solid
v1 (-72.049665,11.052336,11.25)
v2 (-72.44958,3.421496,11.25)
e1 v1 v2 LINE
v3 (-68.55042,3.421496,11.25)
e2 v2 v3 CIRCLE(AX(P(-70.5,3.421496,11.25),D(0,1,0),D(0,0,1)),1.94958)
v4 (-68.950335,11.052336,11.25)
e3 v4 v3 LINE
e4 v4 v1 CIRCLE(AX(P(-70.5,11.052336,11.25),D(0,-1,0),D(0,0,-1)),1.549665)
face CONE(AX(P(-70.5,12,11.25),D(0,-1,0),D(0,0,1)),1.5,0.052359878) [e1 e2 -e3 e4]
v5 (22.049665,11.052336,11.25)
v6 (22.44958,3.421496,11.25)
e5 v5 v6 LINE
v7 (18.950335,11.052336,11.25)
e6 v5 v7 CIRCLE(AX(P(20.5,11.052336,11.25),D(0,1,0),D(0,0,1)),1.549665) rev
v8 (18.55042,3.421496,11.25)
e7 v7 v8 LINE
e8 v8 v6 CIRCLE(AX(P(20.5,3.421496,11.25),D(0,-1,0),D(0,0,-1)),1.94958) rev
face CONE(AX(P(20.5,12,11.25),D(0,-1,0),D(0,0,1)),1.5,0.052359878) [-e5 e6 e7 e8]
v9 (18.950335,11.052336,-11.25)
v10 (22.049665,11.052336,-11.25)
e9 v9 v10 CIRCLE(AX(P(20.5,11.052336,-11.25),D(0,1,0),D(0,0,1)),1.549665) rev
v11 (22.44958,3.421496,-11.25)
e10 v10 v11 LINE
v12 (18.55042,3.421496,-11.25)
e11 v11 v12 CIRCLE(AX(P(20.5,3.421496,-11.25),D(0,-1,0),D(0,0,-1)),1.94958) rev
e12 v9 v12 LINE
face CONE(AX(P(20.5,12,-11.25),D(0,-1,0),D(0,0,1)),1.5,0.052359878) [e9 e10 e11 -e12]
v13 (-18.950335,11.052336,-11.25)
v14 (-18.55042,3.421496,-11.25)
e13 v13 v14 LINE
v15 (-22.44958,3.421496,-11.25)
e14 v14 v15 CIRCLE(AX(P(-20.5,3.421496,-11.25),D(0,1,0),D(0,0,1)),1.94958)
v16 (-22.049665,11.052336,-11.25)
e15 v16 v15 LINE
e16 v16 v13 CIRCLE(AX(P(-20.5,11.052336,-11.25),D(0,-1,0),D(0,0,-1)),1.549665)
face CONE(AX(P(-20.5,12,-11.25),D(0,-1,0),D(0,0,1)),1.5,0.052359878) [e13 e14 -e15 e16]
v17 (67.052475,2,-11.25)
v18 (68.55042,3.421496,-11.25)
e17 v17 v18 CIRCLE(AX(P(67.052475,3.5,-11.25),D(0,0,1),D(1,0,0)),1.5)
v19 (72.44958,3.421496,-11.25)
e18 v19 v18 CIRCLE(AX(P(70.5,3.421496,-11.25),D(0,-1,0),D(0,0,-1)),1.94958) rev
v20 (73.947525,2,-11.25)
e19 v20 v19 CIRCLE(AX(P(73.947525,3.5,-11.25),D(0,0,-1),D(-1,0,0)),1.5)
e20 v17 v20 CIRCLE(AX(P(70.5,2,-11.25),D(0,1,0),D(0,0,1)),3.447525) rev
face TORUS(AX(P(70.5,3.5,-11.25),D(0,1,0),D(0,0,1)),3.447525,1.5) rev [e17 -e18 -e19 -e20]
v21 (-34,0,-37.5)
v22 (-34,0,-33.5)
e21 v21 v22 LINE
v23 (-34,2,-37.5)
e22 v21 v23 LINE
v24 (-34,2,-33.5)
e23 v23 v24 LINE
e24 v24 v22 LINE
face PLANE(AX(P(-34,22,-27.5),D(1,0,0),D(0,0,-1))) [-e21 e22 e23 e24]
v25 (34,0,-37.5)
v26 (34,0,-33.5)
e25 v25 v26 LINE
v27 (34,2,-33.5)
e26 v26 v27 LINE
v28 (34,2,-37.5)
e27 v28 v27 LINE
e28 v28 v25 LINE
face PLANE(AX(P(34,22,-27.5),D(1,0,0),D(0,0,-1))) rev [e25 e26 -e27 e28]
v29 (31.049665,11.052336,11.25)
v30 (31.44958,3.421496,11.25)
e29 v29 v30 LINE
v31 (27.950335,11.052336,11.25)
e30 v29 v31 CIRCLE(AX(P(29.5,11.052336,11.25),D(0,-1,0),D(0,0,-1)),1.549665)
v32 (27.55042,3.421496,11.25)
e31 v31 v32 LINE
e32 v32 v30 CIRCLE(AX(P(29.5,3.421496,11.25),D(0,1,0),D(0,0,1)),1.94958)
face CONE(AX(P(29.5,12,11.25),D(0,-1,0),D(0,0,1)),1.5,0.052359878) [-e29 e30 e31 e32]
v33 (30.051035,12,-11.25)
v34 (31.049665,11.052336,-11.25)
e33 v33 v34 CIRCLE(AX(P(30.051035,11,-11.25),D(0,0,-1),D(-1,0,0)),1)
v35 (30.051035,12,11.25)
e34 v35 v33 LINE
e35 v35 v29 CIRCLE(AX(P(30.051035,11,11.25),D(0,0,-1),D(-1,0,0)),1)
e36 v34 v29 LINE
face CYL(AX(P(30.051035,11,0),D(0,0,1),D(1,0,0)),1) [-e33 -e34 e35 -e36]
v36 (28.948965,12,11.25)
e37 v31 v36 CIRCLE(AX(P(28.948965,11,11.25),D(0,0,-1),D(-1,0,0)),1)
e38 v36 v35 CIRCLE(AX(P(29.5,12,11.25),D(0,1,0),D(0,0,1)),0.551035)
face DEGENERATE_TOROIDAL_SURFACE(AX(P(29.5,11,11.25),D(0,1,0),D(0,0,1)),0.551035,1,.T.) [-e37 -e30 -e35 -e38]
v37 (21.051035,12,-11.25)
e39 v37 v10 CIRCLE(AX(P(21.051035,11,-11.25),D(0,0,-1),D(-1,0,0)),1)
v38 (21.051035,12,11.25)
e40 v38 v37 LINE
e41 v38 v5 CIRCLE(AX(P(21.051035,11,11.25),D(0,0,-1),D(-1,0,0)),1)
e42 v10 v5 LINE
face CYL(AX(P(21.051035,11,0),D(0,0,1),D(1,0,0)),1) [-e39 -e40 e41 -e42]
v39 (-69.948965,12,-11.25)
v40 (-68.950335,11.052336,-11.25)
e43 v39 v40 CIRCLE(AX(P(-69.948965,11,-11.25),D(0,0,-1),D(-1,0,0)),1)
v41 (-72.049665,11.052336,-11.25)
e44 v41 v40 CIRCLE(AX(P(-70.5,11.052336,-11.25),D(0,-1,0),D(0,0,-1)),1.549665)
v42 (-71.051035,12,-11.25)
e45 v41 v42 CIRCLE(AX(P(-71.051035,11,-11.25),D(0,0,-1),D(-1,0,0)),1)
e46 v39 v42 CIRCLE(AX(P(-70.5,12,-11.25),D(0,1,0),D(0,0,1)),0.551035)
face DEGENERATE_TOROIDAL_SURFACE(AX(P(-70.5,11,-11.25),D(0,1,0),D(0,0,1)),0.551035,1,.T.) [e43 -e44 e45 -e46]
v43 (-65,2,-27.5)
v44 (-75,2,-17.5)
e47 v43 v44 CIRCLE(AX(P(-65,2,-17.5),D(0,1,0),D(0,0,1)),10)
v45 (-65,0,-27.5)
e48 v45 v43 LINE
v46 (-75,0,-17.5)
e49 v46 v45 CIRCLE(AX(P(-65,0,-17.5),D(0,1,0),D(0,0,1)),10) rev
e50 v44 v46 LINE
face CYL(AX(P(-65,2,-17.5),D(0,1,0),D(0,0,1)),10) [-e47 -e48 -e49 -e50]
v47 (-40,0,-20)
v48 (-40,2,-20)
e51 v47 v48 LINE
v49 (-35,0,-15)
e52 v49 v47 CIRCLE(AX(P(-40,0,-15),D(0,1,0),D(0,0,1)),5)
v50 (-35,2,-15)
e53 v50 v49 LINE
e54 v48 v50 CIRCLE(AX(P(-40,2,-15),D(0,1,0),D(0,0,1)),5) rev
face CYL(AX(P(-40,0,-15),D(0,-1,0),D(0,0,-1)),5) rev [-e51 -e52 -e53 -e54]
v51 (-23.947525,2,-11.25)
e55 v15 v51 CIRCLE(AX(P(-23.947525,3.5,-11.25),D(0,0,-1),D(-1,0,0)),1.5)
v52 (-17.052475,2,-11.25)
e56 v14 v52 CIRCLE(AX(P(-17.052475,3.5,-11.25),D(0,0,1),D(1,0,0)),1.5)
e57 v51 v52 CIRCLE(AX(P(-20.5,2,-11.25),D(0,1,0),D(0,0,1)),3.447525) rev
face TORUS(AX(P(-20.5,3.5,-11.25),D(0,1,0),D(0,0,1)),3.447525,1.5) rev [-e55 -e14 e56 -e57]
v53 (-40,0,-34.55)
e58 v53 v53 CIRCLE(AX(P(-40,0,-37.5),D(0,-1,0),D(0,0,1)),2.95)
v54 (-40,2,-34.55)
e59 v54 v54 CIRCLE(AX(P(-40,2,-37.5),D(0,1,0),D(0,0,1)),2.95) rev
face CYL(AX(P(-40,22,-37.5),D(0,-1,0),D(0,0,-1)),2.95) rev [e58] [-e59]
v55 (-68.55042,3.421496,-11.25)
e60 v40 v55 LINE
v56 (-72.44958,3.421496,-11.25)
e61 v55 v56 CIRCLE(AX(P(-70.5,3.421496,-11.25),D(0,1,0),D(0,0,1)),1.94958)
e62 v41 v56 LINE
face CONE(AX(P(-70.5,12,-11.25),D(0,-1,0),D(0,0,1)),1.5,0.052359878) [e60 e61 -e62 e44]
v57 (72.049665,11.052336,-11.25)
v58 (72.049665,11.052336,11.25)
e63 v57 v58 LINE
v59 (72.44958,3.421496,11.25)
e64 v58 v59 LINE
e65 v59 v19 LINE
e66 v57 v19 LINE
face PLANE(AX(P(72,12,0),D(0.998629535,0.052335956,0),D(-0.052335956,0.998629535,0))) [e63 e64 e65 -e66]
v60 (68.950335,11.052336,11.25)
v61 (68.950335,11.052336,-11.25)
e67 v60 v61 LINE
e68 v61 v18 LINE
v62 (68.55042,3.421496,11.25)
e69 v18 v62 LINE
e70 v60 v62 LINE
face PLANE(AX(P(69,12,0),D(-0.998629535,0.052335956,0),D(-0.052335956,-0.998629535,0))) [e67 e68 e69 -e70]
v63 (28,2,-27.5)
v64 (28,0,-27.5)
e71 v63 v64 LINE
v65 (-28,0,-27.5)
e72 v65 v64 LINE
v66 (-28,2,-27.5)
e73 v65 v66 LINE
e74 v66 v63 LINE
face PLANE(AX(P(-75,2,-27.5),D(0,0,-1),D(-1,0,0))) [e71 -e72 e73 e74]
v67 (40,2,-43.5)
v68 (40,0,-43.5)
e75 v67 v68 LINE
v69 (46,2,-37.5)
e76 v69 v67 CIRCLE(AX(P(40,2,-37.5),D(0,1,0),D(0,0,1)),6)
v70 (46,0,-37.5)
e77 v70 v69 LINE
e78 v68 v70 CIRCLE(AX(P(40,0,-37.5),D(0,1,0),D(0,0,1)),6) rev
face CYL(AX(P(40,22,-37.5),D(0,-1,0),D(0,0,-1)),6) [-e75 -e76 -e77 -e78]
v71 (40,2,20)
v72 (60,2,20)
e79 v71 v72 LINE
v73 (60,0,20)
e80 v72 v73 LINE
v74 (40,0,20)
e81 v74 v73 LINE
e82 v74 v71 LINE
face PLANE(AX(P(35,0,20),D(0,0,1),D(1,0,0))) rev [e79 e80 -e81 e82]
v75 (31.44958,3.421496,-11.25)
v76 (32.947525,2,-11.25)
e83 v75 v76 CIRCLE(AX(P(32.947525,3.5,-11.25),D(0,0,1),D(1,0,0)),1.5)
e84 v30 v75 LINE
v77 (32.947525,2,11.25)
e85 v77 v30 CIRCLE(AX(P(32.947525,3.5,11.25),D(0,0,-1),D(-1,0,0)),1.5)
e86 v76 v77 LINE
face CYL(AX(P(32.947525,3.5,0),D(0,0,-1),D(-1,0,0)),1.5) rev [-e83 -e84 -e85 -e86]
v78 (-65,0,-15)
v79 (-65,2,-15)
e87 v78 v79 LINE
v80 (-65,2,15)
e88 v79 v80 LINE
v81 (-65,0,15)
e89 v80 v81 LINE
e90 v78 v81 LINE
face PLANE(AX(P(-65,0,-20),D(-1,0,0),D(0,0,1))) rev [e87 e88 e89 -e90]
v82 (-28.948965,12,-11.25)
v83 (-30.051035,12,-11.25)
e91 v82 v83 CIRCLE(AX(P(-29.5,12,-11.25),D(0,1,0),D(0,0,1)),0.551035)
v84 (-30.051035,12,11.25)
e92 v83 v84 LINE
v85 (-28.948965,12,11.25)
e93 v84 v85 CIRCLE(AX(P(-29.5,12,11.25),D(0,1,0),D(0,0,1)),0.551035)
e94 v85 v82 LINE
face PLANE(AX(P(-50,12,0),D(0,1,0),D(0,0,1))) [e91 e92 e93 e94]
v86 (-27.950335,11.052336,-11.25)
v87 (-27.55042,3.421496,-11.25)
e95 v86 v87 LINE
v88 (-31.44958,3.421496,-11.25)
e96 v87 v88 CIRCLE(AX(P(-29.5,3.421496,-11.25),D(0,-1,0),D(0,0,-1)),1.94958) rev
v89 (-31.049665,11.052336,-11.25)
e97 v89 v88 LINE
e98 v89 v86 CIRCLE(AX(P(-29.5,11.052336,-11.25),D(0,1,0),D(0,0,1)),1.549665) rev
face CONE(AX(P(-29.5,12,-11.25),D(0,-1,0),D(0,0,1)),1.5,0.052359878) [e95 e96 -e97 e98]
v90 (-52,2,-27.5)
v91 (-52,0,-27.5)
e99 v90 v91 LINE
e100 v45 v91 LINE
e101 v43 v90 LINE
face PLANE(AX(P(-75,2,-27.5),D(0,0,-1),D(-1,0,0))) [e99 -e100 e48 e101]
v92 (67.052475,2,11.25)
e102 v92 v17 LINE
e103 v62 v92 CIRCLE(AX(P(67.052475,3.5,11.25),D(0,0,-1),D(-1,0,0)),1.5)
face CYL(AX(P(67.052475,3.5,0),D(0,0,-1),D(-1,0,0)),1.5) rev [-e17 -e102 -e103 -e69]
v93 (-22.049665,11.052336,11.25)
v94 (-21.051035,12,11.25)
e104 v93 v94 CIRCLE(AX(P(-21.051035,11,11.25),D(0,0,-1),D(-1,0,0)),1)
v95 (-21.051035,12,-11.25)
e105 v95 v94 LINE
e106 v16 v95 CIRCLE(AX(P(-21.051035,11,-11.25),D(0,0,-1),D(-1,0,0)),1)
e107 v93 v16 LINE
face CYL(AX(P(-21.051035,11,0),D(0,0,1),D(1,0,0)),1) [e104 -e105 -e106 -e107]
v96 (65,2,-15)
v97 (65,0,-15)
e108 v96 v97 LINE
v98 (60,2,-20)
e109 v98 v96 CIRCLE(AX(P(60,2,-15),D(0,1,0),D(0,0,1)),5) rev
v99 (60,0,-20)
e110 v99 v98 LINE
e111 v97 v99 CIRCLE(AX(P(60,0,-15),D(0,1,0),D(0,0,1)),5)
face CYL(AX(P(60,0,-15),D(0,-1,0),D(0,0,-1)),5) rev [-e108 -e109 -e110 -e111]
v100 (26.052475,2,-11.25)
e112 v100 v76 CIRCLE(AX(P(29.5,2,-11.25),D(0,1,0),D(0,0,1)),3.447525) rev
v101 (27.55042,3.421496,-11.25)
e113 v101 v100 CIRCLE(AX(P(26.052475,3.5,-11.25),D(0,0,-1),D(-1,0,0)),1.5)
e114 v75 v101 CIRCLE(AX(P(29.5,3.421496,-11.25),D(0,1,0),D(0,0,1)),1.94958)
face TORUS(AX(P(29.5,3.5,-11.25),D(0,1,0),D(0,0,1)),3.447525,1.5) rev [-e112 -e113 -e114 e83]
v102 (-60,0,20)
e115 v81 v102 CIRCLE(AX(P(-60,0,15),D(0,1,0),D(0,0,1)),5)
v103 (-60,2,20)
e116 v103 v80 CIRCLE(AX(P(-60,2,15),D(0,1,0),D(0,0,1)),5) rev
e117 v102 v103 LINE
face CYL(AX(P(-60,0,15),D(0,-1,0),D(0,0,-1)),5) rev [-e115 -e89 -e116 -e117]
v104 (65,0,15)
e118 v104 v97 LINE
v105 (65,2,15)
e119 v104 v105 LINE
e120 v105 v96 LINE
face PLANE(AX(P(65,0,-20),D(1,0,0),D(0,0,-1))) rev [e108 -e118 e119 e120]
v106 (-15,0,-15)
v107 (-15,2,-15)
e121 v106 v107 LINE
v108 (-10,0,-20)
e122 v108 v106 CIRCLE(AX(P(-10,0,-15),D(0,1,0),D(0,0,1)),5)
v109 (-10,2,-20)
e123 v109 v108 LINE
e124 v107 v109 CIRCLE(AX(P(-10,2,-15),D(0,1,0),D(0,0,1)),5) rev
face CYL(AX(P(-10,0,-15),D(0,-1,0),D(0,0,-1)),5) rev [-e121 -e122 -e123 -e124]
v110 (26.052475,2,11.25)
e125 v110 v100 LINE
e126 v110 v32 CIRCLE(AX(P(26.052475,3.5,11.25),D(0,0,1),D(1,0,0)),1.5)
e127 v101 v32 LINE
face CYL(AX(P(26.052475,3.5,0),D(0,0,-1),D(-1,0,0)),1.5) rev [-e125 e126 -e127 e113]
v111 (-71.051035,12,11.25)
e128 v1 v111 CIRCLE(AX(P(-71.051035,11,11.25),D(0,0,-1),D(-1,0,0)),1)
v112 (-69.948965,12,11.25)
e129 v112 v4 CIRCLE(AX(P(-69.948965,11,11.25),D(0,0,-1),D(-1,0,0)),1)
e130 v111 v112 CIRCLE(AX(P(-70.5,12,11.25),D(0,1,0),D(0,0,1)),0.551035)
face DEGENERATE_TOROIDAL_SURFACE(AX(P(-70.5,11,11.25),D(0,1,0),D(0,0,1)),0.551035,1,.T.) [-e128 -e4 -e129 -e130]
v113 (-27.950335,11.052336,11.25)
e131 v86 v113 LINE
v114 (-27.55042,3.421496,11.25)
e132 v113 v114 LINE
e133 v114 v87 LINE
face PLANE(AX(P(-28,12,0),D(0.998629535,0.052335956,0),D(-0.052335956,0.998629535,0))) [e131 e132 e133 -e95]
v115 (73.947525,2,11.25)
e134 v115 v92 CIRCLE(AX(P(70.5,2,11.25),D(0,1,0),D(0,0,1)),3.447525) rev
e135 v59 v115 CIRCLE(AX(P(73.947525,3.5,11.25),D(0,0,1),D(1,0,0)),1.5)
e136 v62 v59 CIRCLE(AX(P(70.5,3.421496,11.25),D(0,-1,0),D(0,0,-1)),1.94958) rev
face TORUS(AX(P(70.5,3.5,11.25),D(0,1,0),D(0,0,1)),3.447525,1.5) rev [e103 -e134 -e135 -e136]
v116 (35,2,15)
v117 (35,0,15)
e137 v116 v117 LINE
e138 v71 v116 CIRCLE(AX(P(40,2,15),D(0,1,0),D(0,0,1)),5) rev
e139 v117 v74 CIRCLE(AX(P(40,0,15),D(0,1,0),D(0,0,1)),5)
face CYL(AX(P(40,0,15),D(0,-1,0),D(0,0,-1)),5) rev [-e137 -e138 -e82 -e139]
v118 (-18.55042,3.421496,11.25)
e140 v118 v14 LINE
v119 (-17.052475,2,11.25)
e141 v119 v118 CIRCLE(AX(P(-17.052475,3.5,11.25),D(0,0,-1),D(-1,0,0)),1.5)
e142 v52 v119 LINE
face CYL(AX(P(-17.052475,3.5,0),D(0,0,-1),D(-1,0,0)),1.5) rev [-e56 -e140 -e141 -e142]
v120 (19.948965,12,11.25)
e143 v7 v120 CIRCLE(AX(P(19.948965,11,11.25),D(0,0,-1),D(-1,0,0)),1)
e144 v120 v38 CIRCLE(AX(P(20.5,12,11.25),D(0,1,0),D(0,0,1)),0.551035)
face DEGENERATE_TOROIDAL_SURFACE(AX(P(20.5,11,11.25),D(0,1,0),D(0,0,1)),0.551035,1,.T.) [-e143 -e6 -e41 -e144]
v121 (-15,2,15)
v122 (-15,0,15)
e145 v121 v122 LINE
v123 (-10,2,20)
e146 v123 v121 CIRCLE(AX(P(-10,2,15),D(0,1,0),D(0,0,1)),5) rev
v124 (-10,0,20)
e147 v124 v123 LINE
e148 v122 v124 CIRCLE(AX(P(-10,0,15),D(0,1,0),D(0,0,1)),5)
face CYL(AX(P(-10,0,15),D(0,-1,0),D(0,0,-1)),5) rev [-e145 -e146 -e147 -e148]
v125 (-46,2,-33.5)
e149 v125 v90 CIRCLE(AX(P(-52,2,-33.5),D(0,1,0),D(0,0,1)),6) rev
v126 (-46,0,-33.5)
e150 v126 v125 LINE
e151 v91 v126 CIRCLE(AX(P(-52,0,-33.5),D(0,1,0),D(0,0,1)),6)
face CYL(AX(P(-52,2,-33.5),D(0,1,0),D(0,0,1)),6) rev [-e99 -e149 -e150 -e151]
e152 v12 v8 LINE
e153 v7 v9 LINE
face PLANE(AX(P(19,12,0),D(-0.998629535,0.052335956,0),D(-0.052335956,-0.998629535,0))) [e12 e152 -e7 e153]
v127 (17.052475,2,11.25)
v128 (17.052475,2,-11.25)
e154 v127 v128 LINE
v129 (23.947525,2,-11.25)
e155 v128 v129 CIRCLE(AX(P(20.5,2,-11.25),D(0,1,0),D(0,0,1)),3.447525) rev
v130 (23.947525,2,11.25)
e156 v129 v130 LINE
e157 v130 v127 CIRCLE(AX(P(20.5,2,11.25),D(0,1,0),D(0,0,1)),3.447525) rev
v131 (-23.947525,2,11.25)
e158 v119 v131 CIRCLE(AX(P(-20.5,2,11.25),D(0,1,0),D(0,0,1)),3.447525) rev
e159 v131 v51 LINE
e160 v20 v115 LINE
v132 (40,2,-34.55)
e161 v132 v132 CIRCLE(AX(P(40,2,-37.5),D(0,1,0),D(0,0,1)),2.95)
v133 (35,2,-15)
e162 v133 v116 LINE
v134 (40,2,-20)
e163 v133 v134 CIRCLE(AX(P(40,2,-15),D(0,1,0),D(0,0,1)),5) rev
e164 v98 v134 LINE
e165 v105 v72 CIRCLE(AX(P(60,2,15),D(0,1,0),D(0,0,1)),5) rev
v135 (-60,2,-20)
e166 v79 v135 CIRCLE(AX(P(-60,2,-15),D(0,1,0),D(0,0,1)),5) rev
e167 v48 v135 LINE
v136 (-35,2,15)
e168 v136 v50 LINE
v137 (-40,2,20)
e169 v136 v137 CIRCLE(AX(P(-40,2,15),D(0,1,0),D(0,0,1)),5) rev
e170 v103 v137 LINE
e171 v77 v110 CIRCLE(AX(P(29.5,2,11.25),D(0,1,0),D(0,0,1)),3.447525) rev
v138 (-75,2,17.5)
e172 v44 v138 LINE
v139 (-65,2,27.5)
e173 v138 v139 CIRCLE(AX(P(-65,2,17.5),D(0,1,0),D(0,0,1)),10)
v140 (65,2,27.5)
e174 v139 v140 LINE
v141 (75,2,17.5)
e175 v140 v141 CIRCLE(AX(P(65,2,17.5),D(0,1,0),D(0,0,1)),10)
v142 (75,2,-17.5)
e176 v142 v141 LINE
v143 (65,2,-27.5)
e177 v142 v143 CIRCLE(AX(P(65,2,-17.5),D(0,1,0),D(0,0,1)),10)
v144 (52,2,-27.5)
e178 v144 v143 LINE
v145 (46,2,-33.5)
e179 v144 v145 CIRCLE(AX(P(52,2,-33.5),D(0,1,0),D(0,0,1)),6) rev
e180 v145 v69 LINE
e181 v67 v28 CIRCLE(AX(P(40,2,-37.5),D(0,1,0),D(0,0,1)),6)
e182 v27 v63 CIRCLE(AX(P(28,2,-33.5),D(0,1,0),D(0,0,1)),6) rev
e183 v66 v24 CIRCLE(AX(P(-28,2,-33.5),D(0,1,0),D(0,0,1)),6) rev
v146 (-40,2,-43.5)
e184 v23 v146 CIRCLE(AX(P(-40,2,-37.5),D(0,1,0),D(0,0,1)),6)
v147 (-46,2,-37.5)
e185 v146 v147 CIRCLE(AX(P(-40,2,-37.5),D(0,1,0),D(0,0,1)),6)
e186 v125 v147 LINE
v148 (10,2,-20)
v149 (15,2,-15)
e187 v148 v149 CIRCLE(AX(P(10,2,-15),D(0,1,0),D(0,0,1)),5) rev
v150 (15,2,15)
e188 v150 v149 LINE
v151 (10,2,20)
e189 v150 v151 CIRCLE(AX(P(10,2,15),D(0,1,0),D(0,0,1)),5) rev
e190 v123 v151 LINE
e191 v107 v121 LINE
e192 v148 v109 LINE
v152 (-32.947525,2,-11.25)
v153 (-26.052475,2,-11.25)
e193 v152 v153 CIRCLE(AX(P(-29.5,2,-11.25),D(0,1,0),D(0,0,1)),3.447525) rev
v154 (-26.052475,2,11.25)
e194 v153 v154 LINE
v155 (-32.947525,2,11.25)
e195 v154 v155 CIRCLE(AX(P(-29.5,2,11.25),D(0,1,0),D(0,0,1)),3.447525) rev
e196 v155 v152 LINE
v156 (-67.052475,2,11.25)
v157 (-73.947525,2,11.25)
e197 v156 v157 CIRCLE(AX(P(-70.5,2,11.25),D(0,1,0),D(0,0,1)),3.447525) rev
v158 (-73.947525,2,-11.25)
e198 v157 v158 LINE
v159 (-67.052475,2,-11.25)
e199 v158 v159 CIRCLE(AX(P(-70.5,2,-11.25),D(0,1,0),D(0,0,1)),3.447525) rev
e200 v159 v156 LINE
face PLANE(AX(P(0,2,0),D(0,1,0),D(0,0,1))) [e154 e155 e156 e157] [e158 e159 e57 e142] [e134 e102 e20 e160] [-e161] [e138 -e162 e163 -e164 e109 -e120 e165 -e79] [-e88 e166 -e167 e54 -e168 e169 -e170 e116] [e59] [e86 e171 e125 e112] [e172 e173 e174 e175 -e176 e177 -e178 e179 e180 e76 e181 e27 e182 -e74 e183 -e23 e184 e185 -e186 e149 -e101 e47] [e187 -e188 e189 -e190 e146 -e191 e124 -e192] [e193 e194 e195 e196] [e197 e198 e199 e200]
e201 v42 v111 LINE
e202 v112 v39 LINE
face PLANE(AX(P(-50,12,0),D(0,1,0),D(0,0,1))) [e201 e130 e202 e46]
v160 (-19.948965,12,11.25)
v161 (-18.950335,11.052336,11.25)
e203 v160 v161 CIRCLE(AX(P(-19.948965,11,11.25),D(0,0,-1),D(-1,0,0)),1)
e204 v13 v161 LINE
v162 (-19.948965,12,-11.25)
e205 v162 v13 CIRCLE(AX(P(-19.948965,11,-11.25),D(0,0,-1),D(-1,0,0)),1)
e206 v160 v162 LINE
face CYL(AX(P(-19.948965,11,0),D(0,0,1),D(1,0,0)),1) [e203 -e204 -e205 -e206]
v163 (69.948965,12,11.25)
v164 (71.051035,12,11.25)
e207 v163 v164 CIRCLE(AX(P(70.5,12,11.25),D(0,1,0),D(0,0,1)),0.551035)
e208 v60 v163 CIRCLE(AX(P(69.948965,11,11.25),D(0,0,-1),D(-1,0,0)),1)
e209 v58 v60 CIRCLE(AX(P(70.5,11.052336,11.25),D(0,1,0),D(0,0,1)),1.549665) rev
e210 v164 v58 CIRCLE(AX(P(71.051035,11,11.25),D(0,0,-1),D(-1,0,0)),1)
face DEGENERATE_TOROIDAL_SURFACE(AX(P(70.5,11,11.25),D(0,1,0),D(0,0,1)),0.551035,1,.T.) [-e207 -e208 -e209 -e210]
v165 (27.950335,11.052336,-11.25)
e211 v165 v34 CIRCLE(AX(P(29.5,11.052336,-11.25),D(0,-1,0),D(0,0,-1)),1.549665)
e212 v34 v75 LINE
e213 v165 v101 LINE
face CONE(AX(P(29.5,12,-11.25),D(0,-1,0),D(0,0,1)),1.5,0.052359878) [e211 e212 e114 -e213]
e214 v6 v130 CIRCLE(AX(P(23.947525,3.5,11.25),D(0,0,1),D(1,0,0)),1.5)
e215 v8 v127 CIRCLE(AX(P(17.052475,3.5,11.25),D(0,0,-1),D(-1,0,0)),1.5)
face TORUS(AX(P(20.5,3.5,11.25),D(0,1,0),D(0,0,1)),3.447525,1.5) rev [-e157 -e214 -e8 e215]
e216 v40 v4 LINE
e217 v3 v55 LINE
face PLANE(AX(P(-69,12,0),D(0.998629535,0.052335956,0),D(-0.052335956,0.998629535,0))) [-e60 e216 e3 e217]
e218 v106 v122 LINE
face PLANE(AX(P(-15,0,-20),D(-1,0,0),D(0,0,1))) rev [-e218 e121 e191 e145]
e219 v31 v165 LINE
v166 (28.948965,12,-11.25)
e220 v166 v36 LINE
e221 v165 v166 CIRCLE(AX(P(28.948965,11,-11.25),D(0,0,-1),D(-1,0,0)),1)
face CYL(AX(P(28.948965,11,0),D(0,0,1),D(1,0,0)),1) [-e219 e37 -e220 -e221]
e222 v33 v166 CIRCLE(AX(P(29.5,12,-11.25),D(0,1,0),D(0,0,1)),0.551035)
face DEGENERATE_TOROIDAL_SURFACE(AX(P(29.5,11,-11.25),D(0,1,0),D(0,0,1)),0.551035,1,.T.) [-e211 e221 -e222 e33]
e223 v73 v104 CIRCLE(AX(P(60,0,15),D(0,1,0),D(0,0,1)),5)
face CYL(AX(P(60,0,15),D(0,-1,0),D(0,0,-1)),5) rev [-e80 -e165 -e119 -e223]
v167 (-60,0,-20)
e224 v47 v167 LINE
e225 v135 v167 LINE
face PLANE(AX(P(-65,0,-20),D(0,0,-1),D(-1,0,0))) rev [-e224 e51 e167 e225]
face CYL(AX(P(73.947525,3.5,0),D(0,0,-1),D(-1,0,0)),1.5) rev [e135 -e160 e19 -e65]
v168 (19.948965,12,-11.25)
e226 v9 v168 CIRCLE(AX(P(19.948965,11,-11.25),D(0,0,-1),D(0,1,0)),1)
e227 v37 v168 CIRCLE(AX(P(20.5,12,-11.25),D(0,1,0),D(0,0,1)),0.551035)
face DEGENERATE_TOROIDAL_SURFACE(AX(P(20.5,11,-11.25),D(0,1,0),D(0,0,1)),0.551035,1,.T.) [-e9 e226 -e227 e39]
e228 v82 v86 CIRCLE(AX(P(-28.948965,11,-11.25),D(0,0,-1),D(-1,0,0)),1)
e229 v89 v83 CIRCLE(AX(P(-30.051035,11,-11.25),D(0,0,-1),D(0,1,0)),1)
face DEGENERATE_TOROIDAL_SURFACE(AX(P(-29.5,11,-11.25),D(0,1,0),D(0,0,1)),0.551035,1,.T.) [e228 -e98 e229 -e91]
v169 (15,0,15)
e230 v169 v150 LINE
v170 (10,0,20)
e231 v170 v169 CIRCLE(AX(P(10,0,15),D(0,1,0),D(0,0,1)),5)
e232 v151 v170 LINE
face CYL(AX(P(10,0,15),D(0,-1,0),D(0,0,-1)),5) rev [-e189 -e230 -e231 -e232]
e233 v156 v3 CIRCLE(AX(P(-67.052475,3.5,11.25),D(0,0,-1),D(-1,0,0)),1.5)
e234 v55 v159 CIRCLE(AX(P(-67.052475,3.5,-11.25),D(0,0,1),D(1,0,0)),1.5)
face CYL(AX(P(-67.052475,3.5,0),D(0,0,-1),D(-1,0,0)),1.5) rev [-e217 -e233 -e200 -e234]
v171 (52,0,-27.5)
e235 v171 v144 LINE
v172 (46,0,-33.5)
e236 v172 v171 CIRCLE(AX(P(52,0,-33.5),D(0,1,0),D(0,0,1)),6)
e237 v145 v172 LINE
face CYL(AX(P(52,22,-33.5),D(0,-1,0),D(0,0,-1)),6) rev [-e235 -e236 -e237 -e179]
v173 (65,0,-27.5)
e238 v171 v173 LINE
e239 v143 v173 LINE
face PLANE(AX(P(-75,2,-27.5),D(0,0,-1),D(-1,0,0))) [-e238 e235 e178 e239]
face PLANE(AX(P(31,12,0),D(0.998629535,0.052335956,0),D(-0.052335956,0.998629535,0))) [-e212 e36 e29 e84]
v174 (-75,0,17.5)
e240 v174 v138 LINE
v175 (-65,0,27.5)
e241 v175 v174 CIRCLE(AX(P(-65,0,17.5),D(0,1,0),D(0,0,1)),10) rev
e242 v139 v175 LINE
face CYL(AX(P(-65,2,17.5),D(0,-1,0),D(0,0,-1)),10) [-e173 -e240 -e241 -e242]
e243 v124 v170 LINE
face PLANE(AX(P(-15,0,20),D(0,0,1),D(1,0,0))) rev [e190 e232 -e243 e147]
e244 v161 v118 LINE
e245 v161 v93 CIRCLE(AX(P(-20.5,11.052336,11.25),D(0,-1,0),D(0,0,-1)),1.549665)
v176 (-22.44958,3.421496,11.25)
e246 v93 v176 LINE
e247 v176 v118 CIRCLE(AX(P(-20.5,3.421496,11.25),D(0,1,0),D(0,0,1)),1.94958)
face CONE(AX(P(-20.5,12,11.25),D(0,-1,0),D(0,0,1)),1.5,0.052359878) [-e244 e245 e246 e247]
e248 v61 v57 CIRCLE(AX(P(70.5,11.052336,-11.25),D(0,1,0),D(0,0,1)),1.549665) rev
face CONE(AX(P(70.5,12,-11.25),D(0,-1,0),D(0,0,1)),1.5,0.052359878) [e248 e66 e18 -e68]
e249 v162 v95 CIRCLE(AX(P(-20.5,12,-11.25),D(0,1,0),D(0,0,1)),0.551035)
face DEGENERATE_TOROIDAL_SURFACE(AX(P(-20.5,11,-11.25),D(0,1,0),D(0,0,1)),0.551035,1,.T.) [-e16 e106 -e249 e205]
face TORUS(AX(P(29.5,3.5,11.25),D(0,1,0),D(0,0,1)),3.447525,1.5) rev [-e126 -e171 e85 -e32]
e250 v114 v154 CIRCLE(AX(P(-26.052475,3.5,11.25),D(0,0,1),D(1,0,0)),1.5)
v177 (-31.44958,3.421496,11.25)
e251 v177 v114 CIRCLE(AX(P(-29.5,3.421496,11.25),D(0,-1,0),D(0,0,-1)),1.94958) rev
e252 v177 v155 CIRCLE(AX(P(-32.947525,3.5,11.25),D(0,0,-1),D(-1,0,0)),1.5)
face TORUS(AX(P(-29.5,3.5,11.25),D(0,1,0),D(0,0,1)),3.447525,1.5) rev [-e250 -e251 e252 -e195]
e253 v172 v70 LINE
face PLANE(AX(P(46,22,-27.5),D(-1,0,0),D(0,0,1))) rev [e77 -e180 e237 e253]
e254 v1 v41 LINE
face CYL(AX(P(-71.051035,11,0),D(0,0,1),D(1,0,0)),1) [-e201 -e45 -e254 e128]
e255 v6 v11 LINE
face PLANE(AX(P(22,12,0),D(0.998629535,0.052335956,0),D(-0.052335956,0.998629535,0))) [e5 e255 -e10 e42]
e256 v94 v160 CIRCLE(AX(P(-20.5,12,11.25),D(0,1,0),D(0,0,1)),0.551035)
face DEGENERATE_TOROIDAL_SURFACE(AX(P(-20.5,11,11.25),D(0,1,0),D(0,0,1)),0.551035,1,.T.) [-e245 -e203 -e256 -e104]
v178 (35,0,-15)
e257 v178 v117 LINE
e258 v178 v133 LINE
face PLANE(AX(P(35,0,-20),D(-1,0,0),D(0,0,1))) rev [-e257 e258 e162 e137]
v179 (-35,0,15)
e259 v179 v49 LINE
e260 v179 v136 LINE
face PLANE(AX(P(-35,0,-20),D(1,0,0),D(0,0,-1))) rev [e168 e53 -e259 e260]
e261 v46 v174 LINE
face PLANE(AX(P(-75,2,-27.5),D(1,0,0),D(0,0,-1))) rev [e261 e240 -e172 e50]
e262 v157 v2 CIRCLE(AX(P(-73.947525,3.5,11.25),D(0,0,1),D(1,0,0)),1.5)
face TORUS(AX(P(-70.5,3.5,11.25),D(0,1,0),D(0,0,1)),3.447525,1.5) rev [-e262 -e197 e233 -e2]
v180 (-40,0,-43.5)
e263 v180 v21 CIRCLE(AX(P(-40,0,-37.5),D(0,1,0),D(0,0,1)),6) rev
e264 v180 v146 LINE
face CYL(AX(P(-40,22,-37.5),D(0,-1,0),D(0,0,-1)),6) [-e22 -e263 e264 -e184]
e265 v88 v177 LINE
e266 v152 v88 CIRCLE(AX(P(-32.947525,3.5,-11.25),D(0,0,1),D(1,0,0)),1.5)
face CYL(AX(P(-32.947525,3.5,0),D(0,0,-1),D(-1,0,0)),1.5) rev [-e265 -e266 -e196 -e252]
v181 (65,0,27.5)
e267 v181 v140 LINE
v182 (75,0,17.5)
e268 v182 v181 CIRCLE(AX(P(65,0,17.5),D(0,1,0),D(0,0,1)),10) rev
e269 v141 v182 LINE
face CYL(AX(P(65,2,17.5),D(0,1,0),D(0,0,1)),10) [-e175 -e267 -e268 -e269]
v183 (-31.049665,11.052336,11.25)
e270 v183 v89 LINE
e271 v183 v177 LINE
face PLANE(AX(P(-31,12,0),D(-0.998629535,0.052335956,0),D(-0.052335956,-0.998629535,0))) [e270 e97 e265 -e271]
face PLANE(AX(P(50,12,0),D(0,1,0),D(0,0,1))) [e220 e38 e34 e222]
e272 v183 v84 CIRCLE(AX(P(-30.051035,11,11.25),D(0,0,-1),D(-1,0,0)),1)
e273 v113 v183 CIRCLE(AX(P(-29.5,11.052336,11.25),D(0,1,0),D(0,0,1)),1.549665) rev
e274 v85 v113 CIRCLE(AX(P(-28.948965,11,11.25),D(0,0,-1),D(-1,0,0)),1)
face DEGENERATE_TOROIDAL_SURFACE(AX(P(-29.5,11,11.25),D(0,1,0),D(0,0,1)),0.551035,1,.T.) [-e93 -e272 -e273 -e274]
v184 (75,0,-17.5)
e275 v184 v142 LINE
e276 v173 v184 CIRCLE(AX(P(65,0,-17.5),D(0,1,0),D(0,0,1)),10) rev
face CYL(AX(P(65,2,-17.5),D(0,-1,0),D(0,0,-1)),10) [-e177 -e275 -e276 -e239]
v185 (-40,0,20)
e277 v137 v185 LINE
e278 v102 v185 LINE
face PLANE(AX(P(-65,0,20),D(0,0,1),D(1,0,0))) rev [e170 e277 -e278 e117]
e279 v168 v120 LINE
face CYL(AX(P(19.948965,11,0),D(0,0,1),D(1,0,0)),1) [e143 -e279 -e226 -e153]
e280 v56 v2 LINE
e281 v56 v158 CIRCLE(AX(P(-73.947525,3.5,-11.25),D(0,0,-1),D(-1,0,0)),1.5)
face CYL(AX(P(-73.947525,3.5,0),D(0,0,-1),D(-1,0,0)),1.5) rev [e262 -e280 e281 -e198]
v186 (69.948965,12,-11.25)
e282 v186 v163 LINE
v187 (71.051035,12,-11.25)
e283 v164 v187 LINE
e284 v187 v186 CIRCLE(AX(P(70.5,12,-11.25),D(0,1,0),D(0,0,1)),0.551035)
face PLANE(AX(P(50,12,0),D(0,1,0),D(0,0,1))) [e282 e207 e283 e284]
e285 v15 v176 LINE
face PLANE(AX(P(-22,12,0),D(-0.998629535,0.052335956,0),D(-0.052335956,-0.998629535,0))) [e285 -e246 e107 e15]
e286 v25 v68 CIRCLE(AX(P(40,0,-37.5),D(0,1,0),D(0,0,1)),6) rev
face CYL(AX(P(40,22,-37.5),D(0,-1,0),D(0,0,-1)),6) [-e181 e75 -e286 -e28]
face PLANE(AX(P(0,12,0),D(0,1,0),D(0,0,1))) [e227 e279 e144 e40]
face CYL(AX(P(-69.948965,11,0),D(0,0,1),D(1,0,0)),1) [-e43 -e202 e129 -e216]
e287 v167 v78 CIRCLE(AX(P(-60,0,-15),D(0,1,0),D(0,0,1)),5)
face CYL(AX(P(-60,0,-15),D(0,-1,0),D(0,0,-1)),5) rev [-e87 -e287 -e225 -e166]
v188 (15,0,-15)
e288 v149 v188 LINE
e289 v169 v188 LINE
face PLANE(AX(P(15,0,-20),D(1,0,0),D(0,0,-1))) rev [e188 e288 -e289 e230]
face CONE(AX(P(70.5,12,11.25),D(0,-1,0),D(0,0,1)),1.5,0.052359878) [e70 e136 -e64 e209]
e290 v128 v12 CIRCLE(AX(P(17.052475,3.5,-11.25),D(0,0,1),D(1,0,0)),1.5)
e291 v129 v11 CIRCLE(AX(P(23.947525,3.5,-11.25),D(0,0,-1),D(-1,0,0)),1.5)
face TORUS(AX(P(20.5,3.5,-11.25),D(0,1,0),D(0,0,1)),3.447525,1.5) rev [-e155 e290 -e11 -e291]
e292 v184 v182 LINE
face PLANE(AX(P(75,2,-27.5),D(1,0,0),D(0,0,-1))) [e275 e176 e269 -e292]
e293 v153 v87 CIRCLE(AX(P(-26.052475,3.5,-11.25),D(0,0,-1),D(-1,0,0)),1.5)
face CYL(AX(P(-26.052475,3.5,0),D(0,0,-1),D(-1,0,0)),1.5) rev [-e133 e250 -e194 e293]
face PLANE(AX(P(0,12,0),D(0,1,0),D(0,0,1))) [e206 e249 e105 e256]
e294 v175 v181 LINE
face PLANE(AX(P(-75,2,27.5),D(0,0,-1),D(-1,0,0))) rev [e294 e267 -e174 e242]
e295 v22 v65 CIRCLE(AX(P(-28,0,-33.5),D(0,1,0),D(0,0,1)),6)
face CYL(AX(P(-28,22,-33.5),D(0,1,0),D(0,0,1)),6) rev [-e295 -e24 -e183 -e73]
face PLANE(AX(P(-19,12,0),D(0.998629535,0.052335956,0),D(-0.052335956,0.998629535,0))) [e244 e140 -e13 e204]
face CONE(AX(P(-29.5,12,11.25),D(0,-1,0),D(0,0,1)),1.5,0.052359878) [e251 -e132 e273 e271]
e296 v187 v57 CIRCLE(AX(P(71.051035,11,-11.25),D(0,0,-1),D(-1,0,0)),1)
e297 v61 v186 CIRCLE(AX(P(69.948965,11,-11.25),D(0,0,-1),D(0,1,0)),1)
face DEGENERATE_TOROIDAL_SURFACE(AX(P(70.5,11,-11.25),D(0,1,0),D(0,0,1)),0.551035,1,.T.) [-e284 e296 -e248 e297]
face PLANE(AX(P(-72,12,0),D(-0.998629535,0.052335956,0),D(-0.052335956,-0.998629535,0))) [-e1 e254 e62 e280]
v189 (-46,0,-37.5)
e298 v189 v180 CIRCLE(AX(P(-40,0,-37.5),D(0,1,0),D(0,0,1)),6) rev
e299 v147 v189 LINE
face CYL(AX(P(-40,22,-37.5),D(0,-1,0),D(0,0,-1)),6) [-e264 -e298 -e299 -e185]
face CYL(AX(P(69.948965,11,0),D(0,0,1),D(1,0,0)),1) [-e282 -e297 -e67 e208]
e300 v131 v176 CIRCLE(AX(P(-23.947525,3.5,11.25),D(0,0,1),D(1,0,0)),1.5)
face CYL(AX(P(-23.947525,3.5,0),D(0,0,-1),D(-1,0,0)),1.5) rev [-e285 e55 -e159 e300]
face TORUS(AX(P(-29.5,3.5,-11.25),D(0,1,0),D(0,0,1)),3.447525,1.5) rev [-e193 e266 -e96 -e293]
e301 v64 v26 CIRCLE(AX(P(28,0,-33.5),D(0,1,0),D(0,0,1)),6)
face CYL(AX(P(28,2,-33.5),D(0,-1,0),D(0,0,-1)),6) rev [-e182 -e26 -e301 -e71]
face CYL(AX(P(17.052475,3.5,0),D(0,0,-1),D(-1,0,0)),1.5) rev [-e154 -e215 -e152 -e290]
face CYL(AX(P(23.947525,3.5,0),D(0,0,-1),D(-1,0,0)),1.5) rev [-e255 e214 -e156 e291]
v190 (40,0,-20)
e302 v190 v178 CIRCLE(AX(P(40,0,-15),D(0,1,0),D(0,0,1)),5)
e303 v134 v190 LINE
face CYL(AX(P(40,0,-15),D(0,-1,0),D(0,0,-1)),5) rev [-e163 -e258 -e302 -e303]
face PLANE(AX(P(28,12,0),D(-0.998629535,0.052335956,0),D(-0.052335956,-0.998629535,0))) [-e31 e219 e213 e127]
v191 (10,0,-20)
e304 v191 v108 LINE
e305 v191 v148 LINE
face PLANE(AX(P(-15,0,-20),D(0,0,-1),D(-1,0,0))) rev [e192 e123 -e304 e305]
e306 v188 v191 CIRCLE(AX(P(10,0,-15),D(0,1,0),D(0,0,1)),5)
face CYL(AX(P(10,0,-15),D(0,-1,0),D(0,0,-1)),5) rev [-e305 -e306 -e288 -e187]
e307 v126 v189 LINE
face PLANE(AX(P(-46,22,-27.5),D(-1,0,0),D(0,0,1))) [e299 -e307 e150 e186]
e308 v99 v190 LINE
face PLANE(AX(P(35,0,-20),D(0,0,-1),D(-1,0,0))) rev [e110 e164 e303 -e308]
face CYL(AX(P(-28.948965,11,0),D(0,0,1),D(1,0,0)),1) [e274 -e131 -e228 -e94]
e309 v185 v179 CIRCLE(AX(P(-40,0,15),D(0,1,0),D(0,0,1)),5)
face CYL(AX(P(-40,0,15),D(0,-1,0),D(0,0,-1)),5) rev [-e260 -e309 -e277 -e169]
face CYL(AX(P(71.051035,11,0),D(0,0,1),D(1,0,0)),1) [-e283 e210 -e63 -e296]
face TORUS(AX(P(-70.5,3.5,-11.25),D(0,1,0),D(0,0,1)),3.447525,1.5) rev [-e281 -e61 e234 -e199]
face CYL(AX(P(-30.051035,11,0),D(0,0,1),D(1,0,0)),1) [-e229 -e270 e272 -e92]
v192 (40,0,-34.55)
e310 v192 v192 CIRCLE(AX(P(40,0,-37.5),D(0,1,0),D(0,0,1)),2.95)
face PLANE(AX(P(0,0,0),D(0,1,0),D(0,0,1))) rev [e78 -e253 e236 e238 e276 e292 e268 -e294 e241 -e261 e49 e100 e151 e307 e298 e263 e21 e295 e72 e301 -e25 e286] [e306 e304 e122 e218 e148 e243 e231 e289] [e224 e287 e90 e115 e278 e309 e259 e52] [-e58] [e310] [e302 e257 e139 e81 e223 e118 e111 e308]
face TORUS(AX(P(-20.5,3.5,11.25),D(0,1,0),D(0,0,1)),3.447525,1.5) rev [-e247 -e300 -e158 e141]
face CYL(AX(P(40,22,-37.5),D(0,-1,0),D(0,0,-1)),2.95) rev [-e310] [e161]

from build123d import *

# Parameters (mm, degrees)
SKETCH1_W                 = 150
SKETCH1_H                 = 55
BOSS_EXTRUDE1_DEPTH       = 2
SKETCH2_W                 = 12
SKETCH2_H                 = 16
SKETCH2_R                 = 2.95
BOSS_EXTRUDE2_DEPTH       = 2
FILLET1_R                 = 6
FILLET1_OF_MIRROR1_R      = 6
BOSS_EXTRUDE3_DEPTH       = 10
DRAFT1_ANGLE              = 3
FILLET2_R                 = 1.5
FILLET5_R                 = 1
DRAFT1_OF_MIRROR2_2_ANGLE = 3
FILLET2_OF_MIRROR2_R      = 1.5
FILLET5_OF_MIRROR2_R      = 1
SKETCH4_W                 = 30
SKETCH4_H                 = 40
CUT_EXTRUDE1_DEPTH        = 88.27685833
FILLET3_R                 = 5
LPATTERN1_START           = -15
LPATTERN1_OUTLINE_W       = 30
LPATTERN1_OUTLINE_H       = 2
LPATTERN1_DEPTH           = 30
LPATTERN1_START_2         = -11.25
LPATTERN1_2_DEPTH         = 22.5
LPATTERN1_START_3         = -1
LPATTERN1_11_DEPTH        = 3
FILLET4_R                 = 10


with BuildPart() as part:
    # Sketch1 → Boss-Extrude1 (new body)
    with BuildSketch(Plane(origin=(0, 0, 0), x_dir=(1, 0, 0), z_dir=(0, 1, 0))):
        Rectangle(SKETCH1_W, SKETCH1_H)
    extrude(amount=BOSS_EXTRUDE1_DEPTH)

    # Sketch2 → Boss-Extrude2 (add)
    with BuildSketch(Plane(origin=(0, 0, 0), x_dir=(1, 0, 0), z_dir=(0, 1, 0))):
        with Locations((40, 35.5)):
            Rectangle(SKETCH2_W, SKETCH2_H)
        with Locations(Location((40, 37.5, 0), (0, 0, 270))):
            Circle(SKETCH2_R, mode=Mode.SUBTRACT)
    boss_extrude2 = extrude(amount=BOSS_EXTRUDE2_DEPTH)

    # Fillet1
    fillet1_edges = [part.edges().sort_by_distance(p)[0] for p in [
        (34, 1, -27.5),
        (46, 1, -27.5),
    ]]
    fillet(fillet1_edges, radius=FILLET1_R)
    fillet1_2_edges = [part.edges().sort_by_distance(p)[0] for p in [
        (34, 1, -43.5),
        (46, 1, -43.5),
    ]]
    fillet(fillet1_2_edges, radius=FILLET1_R - 0.0001)  # a hair under: the kernel refuses the full size

    # Mirror1: Boss-Extrude2 across plane
    add(boss_extrude2.mirror(Plane(origin=(0, 0, 0), x_dir=(0, 0, 1), z_dir=(1, 0, 0))))

    # Fillet1 of Mirror1
    fillet1_of_mirror1_edges = [part.edges().sort_by_distance(p)[0] for p in [
        (-34, 1, -27.5),
        (-46, 1, -27.5),
    ]]
    fillet(fillet1_of_mirror1_edges, radius=FILLET1_OF_MIRROR1_R)
    fillet1_of_mirror1_2_edges = [part.edges().sort_by_distance(p)[0] for p in [
        (-34, 1, -43.5),
        (-46, 1, -43.5),
    ]]
    fillet(fillet1_of_mirror1_2_edges, radius=FILLET1_OF_MIRROR1_R - 0.0001)  # a hair under: the kernel refuses the full size

    # Sketch3 → Boss-Extrude3 (add)
    with BuildSketch(Plane(origin=(0, 2, 0), x_dir=(1, 0, 0), z_dir=(0, 1, 0))):
        with BuildLine():
            ThreePointArc((-19, 11.25), (-20.5, 12.75), (-22, 11.25))
            Line((-22, 11.25), (-19, 11.25))
        make_face()
        with BuildLine():
            Line((-19, 11.25), (-22, 11.25))
            ThreePointArc((-22, 11.25), (-20.5, 9.75), (-19, 11.25))
        make_face()
        with BuildLine():
            ThreePointArc((-19, 11.25), (-20.5, 9.75), (-22, 11.25))
            Line((-22, 11.25), (-22, -11.25))
            ThreePointArc((-22, -11.25), (-20.5, -9.75), (-19, -11.25))
            Line((-19, -11.25), (-19, 11.25))
        make_face()
        with BuildLine():
            ThreePointArc((-19, -11.25), (-20.5, -9.75), (-22, -11.25))
            Line((-22, -11.25), (-19, -11.25))
        make_face()
        with BuildLine():
            Line((-19, -11.25), (-22, -11.25))
            ThreePointArc((-22, -11.25), (-20.5, -12.75), (-19, -11.25))
        make_face()
    boss_extrude3 = extrude(amount=BOSS_EXTRUDE3_DEPTH)

    # Draft1
    draft1_faces = [part.faces().sort_by_distance(p)[0] for p in [
        (-20.5, 7, -12.75),
        (-22, 7, 0),
        (-20.5, 7, 12.75),
        (-19, 7, 0),
    ]]
    draft(draft1_faces, Plane.ZX.offset(12), DRAFT1_ANGLE)

    # Fillet2
    fillet2_edges = [part.edges().sort_by_distance(p)[0] for p in [
        (-20.5, 2, -13.274077793),
        (-22.524077793, 2, 0),
        (-20.5, 2, 13.274077793),
        (-18.475922207, 2, 0),
    ]]
    fillet(fillet2_edges, radius=FILLET2_R)

    # Fillet5
    fillet5_edges = [part.edges().sort_by_distance(p)[0] for p in [
        (-19, 12, 0),
        (-20.5, 12, -12.75),
        (-22, 12, 0),
        (-20.5, 12, 12.75),
    ]]
    fillet(fillet5_edges, radius=FILLET5_R)

    # Mirror2: Boss-Extrude3 across plane
    add(boss_extrude3.mirror(Plane(origin=(0, 0, 0), x_dir=(0, 0, 1), z_dir=(1, 0, 0))))

    # Draft1 of Mirror2 2
    draft1_of_mirror2_2_faces = [part.faces().sort_by_distance(p)[0] for p in [
        (20.5, 7, -12.75),
        (22, 7, 0),
        (20.5, 7, 12.75),
        (19, 7, 0),
    ]]
    draft(draft1_of_mirror2_2_faces, Plane.ZX.offset(12), DRAFT1_OF_MIRROR2_2_ANGLE)

    # Fillet2 of Mirror2
    fillet2_of_mirror2_edges = [part.edges().sort_by_distance(p)[0] for p in [
        (20.5, 2, -13.274077793),
        (22.524077793, 2, 0),
        (20.5, 2, 13.274077793),
        (18.475922207, 2, 0),
    ]]
    fillet(fillet2_of_mirror2_edges, radius=FILLET2_OF_MIRROR2_R)

    # Fillet5 of Mirror2
    fillet5_of_mirror2_edges = [part.edges().sort_by_distance(p)[0] for p in [
        (19, 12, 0),
        (20.5, 12, -12.75),
        (22, 12, 0),
        (20.5, 12, 12.75),
    ]]
    fillet(fillet5_of_mirror2_edges, radius=FILLET5_OF_MIRROR2_R)

    # Sketch4 → Cut-Extrude1 (cut, through all)
    with BuildSketch(Plane(origin=(0, 2, 0), x_dir=(1, 0, 0), z_dir=(0, 1, 0))):
        Rectangle(SKETCH4_W, SKETCH4_H)
    extrude(amount=-CUT_EXTRUDE1_DEPTH, mode=Mode.SUBTRACT)

    # Fillet3
    fillet3_edges = [part.edges().sort_by_distance(p)[0] for p in [
        (15, 1, -20),
        (15, 1, 20),
        (-15, 1, 20),
        (-15, 1, -20),
    ]]
    fillet(fillet3_edges, radius=FILLET3_R)

    # LPattern1: read off the stored shape, not the designer's step
    # LPattern1 outline → LPattern1 (cut)
    with BuildSketch(Plane.XY.offset(LPATTERN1_START)):
        with Locations((-50, 1)):
            Rectangle(LPATTERN1_OUTLINE_W, LPATTERN1_OUTLINE_H)
        with Locations((50, 1)):
            Rectangle(LPATTERN1_OUTLINE_W, LPATTERN1_OUTLINE_H)
    extrude(amount=LPATTERN1_DEPTH, mode=Mode.SUBTRACT)

    # LPattern1 2 outline → LPattern1 2 (add)
    with BuildSketch(Plane.XY.offset(LPATTERN1_START_2)):
        with BuildLine():
            ThreePointArc((-27.950335032, 11.052335956), (-28.260609991, 11.725374371), (-28.948964567, 12))
            Line((-28.948964567, 12), (-30.051035433, 12))
            ThreePointArc((-30.051035433, 12), (-30.739390009, 11.725374371), (-31.049664968, 11.052335956))
            Line((-31.049664968, 11.052335956), (-31.449580341, 3.421496066))
            ThreePointArc((-31.449580341, 3.421496066), (-31.914992779, 2.411938443), (-32.947524643, 2))
            Line((-32.947524643, 2), (-26.052475357, 2))
            ThreePointArc((-26.052475357, 2), (-27.085007221, 2.411938443), (-27.550419659, 3.421496066))
            Line((-27.550419659, 3.421496066), (-27.950335032, 11.052335956))
        make_face()
        with BuildLine():
            ThreePointArc((68.550419659, 3.421496066), (68.085007221, 2.411938443), (67.052475357, 2))
            Line((67.052475357, 2), (73.947524643, 2))
            ThreePointArc((73.947524643, 2), (72.914992779, 2.411938443), (72.449580341, 3.421496066))
            Line((72.449580341, 3.421496066), (72.049664968, 11.052335956))
            ThreePointArc((72.049664968, 11.052335956), (71.739390009, 11.725374371), (71.051035433, 12))
            Line((71.051035433, 12), (69.948964567, 12))
            ThreePointArc((69.948964567, 12), (69.260609991, 11.725374371), (68.950335032, 11.052335956))
            Line((68.950335032, 11.052335956), (68.550419659, 3.421496066))
        make_face()
        with BuildLine():
            Line((-73.947524643, 2), (-67.052475357, 2))
            ThreePointArc((-67.052475357, 2), (-68.085007221, 2.411938443), (-68.550419659, 3.421496066))
            Line((-68.550419659, 3.421496066), (-68.950335032, 11.052335956))
            ThreePointArc((-68.950335032, 11.052335956), (-69.260609991, 11.725374371), (-69.948964567, 12))
            Line((-69.948964567, 12), (-71.051035433, 12))
            ThreePointArc((-71.051035433, 12), (-71.739390009, 11.725374371), (-72.049664968, 11.052335956))
            Line((-72.049664968, 11.052335956), (-72.449580341, 3.421496066))
            ThreePointArc((-72.449580341, 3.421496066), (-72.914992779, 2.411938443), (-73.947524643, 2))
        make_face()
        with BuildLine():
            ThreePointArc((27.550419659, 3.421496066), (27.085007221, 2.411938443), (26.052475357, 2))
            Line((26.052475357, 2), (32.947524643, 2))
            ThreePointArc((32.947524643, 2), (31.914992779, 2.411938443), (31.449580341, 3.421496066))
            Line((31.449580341, 3.421496066), (31.049664968, 11.052335956))
            ThreePointArc((31.049664968, 11.052335956), (30.739390009, 11.725374371), (30.051035433, 12))
            Line((30.051035433, 12), (28.948964567, 12))
            ThreePointArc((28.948964567, 12), (28.260609991, 11.725374371), (27.950335032, 11.052335956))
            Line((27.950335032, 11.052335956), (27.550419659, 3.421496066))
        make_face()
    extrude(amount=LPATTERN1_2_DEPTH)

    # LPattern1 3 outline → LPattern1 3 (revolve)
    with BuildSketch(Plane(origin=(-29.5, 0, -11.25), x_dir=(1, 0, 0), z_dir=(0, 0, 1))):
        with BuildLine():
            Line((1.949580341, 3.421496066), (1.549664968, 11.052335956))
            ThreePointArc((1.549664968, 11.052335956), (1.239390009, 11.725374371), (0.551035433, 12))
            Line((0.551035433, 12), (0, 12))
            Line((0, 12), (0, 2))
            Line((0, 2), (3.447524643, 2))
            ThreePointArc((3.447524643, 2), (2.414992779, 2.411938443), (1.949580341, 3.421496066))
        make_face()
    revolve(axis=Axis((-29.5, 0, -11.25), (0, 1, 0)))

    # LPattern1 4 outline → LPattern1 4 (revolve)
    with BuildSketch(Plane(origin=(-29.5, 0, 11.25), x_dir=(1, 0, 0), z_dir=(0, 0, 1))):
        with BuildLine():
            Line((1.949580341, 3.421496066), (1.549664968, 11.052335956))
            ThreePointArc((1.549664968, 11.052335956), (1.239390009, 11.725374371), (0.551035433, 12))
            Line((0.551035433, 12), (0, 12))
            Line((0, 12), (0, 2))
            Line((0, 2), (3.447524643, 2))
            ThreePointArc((3.447524643, 2), (2.414992779, 2.411938443), (1.949580341, 3.421496066))
        make_face()
    revolve(axis=Axis((-29.5, 0, 11.25), (0, 1, 0)))

    # LPattern1 5 outline → LPattern1 5 (revolve)
    with BuildSketch(Plane(origin=(70.5, 0, -11.25), x_dir=(1, 0, 0), z_dir=(0, 0, 1))):
        with BuildLine():
            Line((1.949580341, 3.421496066), (1.549664968, 11.052335956))
            ThreePointArc((1.549664968, 11.052335956), (1.239390009, 11.725374371), (0.551035433, 12))
            Line((0.551035433, 12), (0, 12))
            Line((0, 12), (0, 2))
            Line((0, 2), (3.447524643, 2))
            ThreePointArc((3.447524643, 2), (2.414992779, 2.411938443), (1.949580341, 3.421496066))
        make_face()
    revolve(axis=Axis((70.5, 0, -11.25), (0, 1, 0)))

    # LPattern1 6 outline → LPattern1 6 (revolve)
    with BuildSketch(Plane(origin=(70.5, 0, 11.25), x_dir=(1, 0, 0), z_dir=(0, 0, 1))):
        with BuildLine():
            Line((1.949580341, 3.421496066), (1.549664968, 11.052335956))
            ThreePointArc((1.549664968, 11.052335956), (1.239390009, 11.725374371), (0.551035433, 12))
            Line((0.551035433, 12), (0, 12))
            Line((0, 12), (0, 2))
            Line((0, 2), (3.447524643, 2))
            ThreePointArc((3.447524643, 2), (2.414992779, 2.411938443), (1.949580341, 3.421496066))
        make_face()
    revolve(axis=Axis((70.5, 0, 11.25), (0, 1, 0)))

    # LPattern1 7 outline → LPattern1 7 (revolve)
    with BuildSketch(Plane(origin=(29.5, 0, -11.25), x_dir=(1, 0, 0), z_dir=(0, 0, 1))):
        with BuildLine():
            Line((1.949580341, 3.421496066), (1.549664968, 11.052335956))
            ThreePointArc((1.549664968, 11.052335956), (1.239390009, 11.725374371), (0.551035433, 12))
            Line((0.551035433, 12), (0, 12))
            Line((0, 12), (0, 2))
            Line((0, 2), (3.447524643, 2))
            ThreePointArc((3.447524643, 2), (2.414992779, 2.411938443), (1.949580341, 3.421496066))
        make_face()
    revolve(axis=Axis((29.5, 0, -11.25), (0, 1, 0)))

    # LPattern1 8 outline → LPattern1 8 (revolve)
    with BuildSketch(Plane(origin=(29.5, 0, 11.25), x_dir=(1, 0, 0), z_dir=(0, 0, 1))):
        with BuildLine():
            Line((1.949580341, 3.421496066), (1.549664968, 11.052335956))
            ThreePointArc((1.549664968, 11.052335956), (1.239390009, 11.725374371), (0.551035433, 12))
            Line((0.551035433, 12), (0, 12))
            Line((0, 12), (0, 2))
            Line((0, 2), (3.447524643, 2))
            ThreePointArc((3.447524643, 2), (2.414992779, 2.411938443), (1.949580341, 3.421496066))
        make_face()
    revolve(axis=Axis((29.5, 0, 11.25), (0, 1, 0)))

    # LPattern1 9 outline → LPattern1 9 (revolve)
    with BuildSketch(Plane(origin=(-70.5, 0, -11.25), x_dir=(1, 0, 0), z_dir=(0, 0, 1))):
        with BuildLine():
            Line((1.949580341, 3.421496066), (1.549664968, 11.052335956))
            ThreePointArc((1.549664968, 11.052335956), (1.239390009, 11.725374371), (0.551035433, 12))
            Line((0.551035433, 12), (0, 12))
            Line((0, 12), (0, 2))
            Line((0, 2), (3.447524643, 2))
            ThreePointArc((3.447524643, 2), (2.414992779, 2.411938443), (1.949580341, 3.421496066))
        make_face()
    revolve(axis=Axis((-70.5, 0, -11.25), (0, 1, 0)))

    # LPattern1 10 outline → LPattern1 10 (revolve)
    with BuildSketch(Plane(origin=(-70.5, 0, 11.25), x_dir=(1, 0, 0), z_dir=(0, 0, 1))):
        with BuildLine():
            Line((1.949580341, 3.421496066), (1.549664968, 11.052335956))
            ThreePointArc((1.549664968, 11.052335956), (1.239390009, 11.725374371), (0.551035433, 12))
            Line((0.551035433, 12), (0, 12))
            Line((0, 12), (0, 2))
            Line((0, 2), (3.447524643, 2))
            ThreePointArc((3.447524643, 2), (2.414992779, 2.411938443), (1.949580341, 3.421496066))
        make_face()
    revolve(axis=Axis((-70.5, 0, 11.25), (0, 1, 0)))

    # LPattern1 11 outline → LPattern1 11 (cut)
    with BuildSketch(Plane(origin=(0, 0, 0), x_dir=(1, 0, 0), z_dir=(0, 1, 0)).offset(LPATTERN1_START_3)):
        with BuildLine():
            ThreePointArc((35, -15), (36.464466094, -18.535533906), (40, -20))
            Line((40, -20), (60, -20))
            ThreePointArc((60, -20), (63.535533906, -18.535533906), (65, -15))
            Line((65, -15), (35, -15))
        make_face()
        with BuildLine():
            ThreePointArc((-65, -15), (-63.535533906, -18.535533906), (-60, -20))
            Line((-60, -20), (-40, -20))
            ThreePointArc((-40, -20), (-36.464466094, -18.535533906), (-35, -15))
            Line((-35, -15), (-65, -15))
        make_face()
        with BuildLine():
            ThreePointArc((65, 15), (63.535533906, 18.535533906), (60, 20))
            Line((60, 20), (40, 20))
            ThreePointArc((40, 20), (36.464466094, 18.535533906), (35, 15))
            Line((35, 15), (65, 15))
        make_face()
        with BuildLine():
            ThreePointArc((-35, 15), (-36.464466094, 18.535533906), (-40, 20))
            Line((-40, 20), (-60, 20))
            ThreePointArc((-60, 20), (-63.535533906, 18.535533906), (-65, 15))
            Line((-65, 15), (-35, 15))
        make_face()
    extrude(amount=LPATTERN1_11_DEPTH, mode=Mode.SUBTRACT)

    # Fillet4
    fillet4_edges = [part.edges().sort_by_distance(p)[0] for p in [
        (-75, 1, -27.5),
        (75, 1, -27.5),
        (75, 1, 27.5),
        (-75, 1, 27.5),
    ]]
    fillet(fillet4_edges, radius=FILLET4_R)


solid = part.part
